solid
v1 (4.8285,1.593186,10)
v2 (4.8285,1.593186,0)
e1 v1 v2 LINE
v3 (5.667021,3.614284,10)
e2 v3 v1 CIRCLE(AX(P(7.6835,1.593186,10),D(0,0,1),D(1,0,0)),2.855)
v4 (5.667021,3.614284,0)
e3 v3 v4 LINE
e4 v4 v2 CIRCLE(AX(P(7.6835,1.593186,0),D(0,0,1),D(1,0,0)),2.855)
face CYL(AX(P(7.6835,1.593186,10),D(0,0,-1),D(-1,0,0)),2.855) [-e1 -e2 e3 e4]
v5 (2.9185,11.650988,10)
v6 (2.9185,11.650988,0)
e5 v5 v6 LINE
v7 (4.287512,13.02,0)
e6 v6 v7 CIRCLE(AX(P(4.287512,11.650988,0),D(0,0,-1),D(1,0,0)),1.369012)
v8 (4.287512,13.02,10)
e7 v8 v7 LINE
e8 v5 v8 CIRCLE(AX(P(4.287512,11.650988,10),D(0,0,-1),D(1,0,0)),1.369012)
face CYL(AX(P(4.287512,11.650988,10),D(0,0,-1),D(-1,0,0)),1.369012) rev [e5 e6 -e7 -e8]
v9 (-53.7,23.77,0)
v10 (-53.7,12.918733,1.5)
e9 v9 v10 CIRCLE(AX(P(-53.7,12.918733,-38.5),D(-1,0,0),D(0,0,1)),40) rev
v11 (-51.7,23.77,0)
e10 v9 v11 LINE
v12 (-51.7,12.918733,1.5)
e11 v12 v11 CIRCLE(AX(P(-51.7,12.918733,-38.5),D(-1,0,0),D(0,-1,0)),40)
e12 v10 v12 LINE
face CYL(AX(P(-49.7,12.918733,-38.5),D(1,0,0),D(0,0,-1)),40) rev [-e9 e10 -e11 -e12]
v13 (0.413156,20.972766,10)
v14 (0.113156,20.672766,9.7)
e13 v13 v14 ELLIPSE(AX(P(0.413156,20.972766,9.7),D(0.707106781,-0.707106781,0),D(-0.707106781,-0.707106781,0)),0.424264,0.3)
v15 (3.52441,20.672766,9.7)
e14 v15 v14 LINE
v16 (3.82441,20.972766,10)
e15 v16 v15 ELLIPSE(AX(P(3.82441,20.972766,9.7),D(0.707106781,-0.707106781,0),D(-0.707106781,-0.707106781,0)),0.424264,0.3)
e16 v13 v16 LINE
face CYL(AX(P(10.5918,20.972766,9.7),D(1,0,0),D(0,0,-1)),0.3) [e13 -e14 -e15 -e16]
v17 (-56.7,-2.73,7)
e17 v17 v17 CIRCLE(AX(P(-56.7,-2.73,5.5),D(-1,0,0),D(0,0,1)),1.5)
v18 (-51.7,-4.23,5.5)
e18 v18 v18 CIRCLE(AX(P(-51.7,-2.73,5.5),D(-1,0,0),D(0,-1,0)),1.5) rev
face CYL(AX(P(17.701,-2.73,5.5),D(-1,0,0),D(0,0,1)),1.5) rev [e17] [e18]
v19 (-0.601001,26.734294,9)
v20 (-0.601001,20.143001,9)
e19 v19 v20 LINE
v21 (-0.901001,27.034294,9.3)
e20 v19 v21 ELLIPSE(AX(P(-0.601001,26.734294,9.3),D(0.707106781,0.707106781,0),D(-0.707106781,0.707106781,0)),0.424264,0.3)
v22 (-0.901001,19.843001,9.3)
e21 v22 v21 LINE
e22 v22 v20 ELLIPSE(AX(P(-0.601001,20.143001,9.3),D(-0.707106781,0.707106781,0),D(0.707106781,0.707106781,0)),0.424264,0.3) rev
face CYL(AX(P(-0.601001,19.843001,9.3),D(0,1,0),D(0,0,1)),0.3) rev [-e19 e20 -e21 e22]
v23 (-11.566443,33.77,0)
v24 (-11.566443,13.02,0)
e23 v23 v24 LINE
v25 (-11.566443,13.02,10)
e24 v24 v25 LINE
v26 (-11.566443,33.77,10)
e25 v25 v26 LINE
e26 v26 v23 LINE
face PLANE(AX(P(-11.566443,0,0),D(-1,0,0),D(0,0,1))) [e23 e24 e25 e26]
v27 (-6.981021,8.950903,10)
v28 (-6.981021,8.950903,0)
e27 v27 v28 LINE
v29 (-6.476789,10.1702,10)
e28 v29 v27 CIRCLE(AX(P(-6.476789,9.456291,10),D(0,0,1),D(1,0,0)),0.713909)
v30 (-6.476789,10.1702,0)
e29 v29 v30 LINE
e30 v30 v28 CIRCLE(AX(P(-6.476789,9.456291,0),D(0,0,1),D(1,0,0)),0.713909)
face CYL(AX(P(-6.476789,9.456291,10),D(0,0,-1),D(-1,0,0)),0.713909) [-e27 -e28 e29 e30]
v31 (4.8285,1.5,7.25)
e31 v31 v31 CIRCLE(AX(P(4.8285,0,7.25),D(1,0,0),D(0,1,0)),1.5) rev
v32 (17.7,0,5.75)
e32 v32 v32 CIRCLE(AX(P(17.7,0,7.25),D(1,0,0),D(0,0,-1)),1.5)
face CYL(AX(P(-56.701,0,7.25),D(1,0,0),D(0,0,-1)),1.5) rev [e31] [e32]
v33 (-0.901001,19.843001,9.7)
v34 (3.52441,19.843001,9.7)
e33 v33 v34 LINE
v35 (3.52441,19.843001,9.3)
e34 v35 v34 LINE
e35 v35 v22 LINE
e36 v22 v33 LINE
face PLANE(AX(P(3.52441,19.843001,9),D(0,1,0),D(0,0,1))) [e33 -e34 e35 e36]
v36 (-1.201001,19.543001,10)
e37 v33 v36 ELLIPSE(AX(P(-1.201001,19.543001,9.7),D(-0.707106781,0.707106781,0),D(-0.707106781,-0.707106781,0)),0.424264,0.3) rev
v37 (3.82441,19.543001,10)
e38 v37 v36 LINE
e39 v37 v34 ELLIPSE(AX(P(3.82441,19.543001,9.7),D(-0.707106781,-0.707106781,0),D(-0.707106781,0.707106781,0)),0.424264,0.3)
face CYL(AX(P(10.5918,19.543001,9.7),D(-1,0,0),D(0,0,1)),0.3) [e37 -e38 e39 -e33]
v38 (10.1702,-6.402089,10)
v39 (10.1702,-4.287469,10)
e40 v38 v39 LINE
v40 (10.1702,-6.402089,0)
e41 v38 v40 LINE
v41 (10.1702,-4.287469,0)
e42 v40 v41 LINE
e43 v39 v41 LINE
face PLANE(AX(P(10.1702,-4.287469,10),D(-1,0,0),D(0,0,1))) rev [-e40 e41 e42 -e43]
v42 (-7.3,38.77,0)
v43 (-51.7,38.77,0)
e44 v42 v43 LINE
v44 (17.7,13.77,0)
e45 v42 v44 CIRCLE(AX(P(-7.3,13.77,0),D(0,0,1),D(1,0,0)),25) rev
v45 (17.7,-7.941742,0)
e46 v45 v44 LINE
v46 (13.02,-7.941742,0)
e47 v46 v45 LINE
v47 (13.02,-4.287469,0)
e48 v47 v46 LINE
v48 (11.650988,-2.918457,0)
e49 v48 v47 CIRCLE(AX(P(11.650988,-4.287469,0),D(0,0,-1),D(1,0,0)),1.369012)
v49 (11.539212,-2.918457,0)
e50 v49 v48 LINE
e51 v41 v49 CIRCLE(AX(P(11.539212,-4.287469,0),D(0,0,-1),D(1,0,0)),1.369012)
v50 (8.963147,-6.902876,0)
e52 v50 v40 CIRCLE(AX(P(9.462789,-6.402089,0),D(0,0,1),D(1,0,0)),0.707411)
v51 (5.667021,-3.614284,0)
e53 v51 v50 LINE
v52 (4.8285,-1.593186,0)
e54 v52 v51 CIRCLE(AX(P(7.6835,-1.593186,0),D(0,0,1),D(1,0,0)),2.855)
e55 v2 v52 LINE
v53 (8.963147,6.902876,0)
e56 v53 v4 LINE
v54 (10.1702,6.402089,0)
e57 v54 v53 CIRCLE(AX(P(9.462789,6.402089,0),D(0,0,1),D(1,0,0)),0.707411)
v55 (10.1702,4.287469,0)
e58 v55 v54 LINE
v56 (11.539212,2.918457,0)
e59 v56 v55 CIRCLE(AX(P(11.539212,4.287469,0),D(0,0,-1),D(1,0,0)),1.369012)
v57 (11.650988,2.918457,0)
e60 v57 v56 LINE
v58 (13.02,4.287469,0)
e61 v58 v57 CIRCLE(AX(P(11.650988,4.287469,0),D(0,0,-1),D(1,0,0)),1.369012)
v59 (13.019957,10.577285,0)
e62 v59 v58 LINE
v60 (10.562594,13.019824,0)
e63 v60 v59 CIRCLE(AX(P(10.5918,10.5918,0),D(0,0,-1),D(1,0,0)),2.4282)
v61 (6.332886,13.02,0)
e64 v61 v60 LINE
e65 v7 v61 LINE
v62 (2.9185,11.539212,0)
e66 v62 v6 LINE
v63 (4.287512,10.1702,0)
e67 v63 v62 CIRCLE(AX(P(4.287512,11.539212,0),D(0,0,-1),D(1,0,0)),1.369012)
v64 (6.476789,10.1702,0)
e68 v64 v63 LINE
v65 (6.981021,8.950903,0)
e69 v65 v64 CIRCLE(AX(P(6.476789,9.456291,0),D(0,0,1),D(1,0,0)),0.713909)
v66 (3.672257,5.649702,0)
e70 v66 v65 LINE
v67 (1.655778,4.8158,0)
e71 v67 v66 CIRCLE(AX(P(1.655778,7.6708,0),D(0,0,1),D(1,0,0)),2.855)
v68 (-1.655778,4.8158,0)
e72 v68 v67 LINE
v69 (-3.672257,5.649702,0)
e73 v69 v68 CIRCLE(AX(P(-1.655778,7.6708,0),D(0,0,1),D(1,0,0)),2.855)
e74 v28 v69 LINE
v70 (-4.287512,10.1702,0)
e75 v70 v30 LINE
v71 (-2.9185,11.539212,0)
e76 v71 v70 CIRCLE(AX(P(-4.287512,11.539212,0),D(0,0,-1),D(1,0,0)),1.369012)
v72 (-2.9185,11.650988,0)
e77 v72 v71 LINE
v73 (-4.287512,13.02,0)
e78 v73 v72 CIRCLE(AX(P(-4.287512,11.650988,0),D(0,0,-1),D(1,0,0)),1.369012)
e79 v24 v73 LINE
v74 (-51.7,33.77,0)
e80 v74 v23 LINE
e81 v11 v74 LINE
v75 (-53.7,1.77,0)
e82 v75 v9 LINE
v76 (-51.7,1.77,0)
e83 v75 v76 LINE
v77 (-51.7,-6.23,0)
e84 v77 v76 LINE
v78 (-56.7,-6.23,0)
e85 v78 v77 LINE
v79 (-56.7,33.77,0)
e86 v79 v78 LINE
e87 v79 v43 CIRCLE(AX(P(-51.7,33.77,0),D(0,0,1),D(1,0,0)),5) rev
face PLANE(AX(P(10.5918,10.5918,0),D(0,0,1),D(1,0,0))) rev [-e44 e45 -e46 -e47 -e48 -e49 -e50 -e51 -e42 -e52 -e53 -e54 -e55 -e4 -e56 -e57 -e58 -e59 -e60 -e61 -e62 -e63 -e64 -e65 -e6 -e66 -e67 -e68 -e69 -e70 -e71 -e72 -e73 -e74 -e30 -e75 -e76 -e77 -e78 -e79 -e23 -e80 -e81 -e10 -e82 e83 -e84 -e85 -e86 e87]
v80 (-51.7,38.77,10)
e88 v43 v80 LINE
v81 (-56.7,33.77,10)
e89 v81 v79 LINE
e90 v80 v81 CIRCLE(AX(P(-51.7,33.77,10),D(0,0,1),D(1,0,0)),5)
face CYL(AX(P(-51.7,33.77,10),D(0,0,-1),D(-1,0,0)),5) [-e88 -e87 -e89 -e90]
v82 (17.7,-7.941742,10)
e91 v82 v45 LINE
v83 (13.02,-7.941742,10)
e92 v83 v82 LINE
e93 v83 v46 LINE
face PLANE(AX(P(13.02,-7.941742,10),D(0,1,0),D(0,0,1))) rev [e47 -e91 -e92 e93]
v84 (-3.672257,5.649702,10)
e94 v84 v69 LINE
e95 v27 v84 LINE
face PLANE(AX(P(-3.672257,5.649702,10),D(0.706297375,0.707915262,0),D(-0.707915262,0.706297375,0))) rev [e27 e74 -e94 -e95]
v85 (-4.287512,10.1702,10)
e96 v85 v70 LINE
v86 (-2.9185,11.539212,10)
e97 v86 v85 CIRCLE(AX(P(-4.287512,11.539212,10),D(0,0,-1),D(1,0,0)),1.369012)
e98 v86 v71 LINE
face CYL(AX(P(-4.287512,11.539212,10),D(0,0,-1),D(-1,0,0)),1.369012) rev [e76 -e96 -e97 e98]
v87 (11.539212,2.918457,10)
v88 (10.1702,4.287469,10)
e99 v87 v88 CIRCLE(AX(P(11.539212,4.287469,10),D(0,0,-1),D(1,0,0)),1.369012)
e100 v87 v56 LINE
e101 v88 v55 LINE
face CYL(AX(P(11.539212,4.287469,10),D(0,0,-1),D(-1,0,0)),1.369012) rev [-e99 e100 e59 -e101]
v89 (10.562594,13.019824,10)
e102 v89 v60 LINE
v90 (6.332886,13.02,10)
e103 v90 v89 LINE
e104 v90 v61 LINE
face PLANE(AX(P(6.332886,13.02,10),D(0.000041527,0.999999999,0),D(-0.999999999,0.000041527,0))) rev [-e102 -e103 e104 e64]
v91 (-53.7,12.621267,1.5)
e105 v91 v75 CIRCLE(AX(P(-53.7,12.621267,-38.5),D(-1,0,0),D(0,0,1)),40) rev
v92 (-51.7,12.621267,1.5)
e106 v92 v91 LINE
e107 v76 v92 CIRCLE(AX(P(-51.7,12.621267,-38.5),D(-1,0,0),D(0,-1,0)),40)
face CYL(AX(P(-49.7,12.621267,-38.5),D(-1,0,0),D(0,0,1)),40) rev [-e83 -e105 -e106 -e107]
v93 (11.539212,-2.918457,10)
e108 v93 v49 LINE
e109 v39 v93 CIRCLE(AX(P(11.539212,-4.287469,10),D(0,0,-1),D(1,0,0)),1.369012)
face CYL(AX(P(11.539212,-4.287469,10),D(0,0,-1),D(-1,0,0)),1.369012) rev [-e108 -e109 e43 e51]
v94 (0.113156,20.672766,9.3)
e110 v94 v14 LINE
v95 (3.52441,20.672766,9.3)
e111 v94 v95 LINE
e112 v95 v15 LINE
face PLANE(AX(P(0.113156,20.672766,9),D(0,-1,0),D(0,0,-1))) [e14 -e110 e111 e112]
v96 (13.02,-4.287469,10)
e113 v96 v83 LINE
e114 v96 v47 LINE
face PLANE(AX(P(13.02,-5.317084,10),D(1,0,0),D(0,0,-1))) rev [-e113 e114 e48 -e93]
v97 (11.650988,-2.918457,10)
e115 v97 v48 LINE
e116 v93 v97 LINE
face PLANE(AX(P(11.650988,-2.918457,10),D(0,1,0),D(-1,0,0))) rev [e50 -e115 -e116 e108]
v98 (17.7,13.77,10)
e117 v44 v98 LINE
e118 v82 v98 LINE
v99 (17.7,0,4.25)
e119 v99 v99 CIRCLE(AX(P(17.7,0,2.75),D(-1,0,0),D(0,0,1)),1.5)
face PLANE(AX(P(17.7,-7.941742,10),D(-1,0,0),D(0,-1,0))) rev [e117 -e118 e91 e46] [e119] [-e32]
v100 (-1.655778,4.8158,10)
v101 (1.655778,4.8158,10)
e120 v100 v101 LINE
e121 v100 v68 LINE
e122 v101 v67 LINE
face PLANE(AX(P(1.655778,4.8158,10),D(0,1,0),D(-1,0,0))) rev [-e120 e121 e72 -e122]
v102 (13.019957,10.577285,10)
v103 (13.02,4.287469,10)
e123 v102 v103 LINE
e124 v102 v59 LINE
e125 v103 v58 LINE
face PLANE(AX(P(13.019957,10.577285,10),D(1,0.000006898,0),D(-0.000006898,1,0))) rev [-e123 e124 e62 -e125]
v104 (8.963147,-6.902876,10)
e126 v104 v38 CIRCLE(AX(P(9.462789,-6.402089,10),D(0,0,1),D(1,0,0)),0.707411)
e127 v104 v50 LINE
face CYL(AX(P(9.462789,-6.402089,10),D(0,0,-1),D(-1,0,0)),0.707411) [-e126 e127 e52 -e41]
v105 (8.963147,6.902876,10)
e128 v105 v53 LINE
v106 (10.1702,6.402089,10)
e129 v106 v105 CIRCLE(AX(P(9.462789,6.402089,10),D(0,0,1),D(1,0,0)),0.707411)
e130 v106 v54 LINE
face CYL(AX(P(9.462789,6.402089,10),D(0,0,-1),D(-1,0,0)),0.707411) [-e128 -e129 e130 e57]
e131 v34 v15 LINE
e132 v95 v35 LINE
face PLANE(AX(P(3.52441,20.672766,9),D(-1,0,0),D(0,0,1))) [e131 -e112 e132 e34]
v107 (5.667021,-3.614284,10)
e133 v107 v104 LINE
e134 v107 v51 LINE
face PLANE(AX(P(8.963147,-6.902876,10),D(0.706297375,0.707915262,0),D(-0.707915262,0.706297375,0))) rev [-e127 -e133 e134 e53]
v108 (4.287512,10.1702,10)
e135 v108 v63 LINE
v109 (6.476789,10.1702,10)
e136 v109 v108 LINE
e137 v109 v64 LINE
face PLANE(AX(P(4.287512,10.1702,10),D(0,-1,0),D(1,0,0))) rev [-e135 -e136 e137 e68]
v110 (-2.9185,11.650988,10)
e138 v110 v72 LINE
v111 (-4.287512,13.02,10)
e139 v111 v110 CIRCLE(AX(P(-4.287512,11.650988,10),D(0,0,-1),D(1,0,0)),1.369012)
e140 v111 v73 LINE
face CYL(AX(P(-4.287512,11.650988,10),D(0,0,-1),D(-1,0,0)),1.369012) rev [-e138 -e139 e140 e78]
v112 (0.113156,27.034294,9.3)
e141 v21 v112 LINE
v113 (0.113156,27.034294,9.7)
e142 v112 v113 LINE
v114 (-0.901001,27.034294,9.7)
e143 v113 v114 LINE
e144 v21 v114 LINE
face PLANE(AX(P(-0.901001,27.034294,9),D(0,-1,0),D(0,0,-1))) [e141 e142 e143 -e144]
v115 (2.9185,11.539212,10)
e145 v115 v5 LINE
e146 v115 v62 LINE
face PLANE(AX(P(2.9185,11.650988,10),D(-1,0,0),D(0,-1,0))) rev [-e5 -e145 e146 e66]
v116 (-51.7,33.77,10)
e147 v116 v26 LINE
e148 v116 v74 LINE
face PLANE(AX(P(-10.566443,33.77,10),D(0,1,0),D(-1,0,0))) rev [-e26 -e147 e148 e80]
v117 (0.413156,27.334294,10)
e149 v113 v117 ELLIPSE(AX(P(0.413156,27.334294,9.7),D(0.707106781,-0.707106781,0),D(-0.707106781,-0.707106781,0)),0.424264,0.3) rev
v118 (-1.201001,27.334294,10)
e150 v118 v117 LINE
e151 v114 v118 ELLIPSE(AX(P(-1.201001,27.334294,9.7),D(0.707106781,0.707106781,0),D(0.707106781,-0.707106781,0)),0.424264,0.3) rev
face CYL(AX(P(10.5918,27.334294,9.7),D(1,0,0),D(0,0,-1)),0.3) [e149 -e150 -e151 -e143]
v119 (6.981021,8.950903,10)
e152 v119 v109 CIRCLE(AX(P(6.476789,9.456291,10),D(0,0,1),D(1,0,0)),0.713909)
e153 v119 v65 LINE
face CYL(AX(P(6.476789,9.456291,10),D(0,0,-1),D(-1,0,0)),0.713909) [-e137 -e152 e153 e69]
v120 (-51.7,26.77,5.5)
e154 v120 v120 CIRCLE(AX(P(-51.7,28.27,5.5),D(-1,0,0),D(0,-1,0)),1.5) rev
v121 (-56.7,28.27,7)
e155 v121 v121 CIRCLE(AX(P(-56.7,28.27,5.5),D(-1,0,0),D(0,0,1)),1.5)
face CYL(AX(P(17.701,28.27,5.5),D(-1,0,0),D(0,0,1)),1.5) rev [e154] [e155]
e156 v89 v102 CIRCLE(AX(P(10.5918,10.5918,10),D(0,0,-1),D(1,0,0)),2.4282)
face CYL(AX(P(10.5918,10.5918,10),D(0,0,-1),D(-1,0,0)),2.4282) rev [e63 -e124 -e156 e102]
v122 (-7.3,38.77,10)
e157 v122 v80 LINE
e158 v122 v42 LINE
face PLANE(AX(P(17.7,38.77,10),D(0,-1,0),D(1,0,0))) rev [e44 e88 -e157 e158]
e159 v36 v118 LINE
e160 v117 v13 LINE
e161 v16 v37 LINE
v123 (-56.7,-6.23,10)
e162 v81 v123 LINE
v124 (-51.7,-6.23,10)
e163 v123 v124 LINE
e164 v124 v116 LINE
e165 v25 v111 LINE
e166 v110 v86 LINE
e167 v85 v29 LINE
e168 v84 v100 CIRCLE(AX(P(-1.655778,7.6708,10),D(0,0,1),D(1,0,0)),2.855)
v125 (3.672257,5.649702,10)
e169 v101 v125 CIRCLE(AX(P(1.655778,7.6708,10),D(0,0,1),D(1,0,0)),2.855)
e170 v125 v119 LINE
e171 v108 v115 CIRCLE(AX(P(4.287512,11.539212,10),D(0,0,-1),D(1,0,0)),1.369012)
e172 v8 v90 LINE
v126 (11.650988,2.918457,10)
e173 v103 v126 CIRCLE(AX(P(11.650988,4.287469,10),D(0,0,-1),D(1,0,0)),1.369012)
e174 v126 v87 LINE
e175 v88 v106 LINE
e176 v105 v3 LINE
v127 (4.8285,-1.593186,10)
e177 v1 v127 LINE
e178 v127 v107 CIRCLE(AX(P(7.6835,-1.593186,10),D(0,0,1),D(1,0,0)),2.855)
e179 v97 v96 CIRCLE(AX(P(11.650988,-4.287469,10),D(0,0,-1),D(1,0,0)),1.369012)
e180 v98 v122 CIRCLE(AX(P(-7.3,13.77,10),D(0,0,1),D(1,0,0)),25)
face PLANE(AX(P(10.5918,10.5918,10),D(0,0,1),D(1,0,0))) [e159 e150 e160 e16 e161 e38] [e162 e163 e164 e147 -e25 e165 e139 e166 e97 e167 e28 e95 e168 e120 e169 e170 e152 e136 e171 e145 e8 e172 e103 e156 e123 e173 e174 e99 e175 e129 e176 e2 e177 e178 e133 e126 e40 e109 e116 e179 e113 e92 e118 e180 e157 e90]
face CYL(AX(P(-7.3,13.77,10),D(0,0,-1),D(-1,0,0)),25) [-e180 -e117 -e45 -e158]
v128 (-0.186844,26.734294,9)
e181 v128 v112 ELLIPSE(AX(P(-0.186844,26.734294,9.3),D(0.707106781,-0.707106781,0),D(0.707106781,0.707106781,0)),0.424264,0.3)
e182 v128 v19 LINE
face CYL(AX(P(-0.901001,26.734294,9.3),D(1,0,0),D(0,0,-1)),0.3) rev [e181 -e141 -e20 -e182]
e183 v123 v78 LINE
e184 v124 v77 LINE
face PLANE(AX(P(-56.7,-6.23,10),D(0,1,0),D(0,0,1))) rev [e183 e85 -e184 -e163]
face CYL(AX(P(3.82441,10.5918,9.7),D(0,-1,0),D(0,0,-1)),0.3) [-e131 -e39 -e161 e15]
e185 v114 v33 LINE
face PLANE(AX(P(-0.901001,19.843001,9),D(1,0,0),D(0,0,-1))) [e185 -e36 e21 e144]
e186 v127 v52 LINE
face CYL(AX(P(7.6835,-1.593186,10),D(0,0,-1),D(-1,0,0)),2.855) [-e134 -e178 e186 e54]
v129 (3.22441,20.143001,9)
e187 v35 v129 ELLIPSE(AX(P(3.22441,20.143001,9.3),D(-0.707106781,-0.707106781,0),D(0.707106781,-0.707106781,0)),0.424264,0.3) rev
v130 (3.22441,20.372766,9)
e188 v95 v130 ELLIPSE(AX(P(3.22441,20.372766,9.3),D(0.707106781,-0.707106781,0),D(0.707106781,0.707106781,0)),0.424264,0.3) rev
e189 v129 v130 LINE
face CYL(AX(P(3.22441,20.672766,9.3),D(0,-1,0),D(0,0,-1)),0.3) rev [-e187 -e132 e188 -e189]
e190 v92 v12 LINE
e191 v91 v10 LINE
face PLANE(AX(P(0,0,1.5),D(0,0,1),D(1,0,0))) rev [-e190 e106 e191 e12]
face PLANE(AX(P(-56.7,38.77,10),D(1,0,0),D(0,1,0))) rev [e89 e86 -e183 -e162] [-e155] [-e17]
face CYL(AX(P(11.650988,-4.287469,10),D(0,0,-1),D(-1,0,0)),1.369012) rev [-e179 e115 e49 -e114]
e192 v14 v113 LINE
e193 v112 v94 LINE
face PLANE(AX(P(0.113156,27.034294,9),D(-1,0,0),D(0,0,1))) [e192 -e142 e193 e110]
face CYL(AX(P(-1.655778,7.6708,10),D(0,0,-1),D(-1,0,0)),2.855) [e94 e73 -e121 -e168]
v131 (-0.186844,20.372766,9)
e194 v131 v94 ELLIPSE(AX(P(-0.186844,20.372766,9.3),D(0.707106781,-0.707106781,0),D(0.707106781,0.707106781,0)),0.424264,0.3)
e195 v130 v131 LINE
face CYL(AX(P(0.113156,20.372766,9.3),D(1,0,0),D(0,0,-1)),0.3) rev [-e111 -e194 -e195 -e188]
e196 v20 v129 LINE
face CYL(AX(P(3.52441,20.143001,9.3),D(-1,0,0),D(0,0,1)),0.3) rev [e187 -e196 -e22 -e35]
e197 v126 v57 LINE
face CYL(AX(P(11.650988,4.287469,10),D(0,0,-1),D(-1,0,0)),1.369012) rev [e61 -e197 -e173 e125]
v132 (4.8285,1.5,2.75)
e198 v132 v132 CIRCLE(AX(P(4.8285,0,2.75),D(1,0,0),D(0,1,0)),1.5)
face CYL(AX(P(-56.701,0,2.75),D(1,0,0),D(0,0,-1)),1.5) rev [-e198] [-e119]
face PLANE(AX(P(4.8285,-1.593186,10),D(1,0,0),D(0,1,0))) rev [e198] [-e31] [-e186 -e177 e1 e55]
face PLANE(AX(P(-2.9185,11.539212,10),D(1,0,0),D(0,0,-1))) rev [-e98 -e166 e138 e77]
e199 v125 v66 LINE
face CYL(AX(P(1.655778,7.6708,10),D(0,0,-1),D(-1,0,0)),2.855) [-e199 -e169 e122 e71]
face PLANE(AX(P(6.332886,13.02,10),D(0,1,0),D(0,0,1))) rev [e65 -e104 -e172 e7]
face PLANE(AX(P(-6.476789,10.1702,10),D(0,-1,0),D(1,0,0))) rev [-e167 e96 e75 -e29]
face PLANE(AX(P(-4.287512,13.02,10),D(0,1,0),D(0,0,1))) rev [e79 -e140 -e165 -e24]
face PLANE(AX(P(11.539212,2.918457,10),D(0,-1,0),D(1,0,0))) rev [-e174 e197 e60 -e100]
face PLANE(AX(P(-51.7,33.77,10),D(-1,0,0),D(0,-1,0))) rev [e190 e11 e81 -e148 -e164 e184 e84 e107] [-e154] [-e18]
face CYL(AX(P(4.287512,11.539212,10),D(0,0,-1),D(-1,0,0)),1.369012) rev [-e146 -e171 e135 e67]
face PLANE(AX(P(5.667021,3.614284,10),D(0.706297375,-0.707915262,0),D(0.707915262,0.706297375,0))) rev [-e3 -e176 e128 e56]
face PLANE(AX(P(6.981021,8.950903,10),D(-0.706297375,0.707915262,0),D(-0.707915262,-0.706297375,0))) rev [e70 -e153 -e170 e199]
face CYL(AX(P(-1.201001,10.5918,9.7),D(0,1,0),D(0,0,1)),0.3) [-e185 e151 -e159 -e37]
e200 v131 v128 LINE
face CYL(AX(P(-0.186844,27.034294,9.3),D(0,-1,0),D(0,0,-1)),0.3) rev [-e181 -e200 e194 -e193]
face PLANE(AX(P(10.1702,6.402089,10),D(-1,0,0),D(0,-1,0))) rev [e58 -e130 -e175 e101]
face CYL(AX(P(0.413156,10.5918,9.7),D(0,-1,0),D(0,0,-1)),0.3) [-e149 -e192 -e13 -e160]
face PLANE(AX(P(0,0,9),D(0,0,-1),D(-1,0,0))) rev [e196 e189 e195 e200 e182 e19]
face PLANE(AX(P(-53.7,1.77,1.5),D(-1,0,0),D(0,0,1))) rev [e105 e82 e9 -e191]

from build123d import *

# Parameters (mm, degrees)
BOSS_EXTRUDE1_DEPTH = 10
CUT_EXTRUDE1_REACH  = 86.489
SKETCH2_R           = 1.5
FILLET3_R           = 5
CUT_EXTRUDE2_REACH  = 86.489
SKETCH3_R           = 1.5
FILLET4_R           = 25
CUT_EXTRUDE7_DEPTH  = 1
FILLET8_R           = 0.3
SKETCH8_W           = 10
SKETCH8_H           = 20.75
BOSS_EXTRUDE2_DEPTH = 1
SKETCH10_W          = 4
SKETCH10_H          = 22
CUT_EXTRUDE9_DEPTH  = 1.5
FILLET10_R          = 40


with BuildPart() as part:
    # Sketch1 → Boss-Extrude1 (new body)
    with BuildSketch(Plane.XY):
        with BuildLine():
            Line((13.02, -7.9417418), (17.7, -7.9417418))
            Line((17.7, -7.9417418), (17.7, 38.77))
            Line((17.7, 38.77), (-56.7, 38.77))
            Line((-56.7, 38.77), (-56.7, -6.23))
            Line((-56.7, -6.23), (-51.7, -6.23))
            Line((-51.7, -6.23), (-51.7, 33.77))
            Line((-51.7, 33.77), (-10.566443095, 33.77))
            Line((-10.566443095, 33.77), (-10.566443095, 13.02))
            Line((-10.566443095, 13.02), (-5.317126718, 13.02))
            Line((-5.317126718, 13.02), (-4.287512407, 13.02))
            ThreePointArc((-4.287512407, 13.02), (-3.319474451, 12.619025549), (-2.9185, 11.650987593))
            Line((-2.9185, 11.650987593), (-2.9185, 11.539212407))
            ThreePointArc((-2.9185, 11.539212407), (-3.319474451, 10.571174451), (-4.287512407, 10.1702))
            Line((-4.287512407, 10.1702), (-6.476788598, 10.1702))
            ThreePointArc((-6.476788598, 10.1702), (-7.136510935, 9.729114651), (-6.981020848, 8.950903446))
            Line((-6.981020848, 8.950903446), (-3.672257405, 5.649701928))
            ThreePointArc((-3.672257405, 5.649701928), (-2.746830644, 5.032499411), (-1.655778399, 4.8158))
            Line((-1.655778399, 4.8158), (1.655778399, 4.8158))
            ThreePointArc((1.655778399, 4.8158), (2.746830644, 5.032499411), (3.672257405, 5.649701928))
            Line((3.672257405, 5.649701928), (6.981020848, 8.950903446))
            ThreePointArc((6.981020848, 8.950903446), (7.136510935, 9.729114651), (6.476788598, 10.1702))
            Line((6.476788598, 10.1702), (4.287512407, 10.1702))
            ThreePointArc((4.287512407, 10.1702), (3.319474451, 10.571174451), (2.9185, 11.539212407))
            Line((2.9185, 11.539212407), (2.9185, 11.650987593))
            ThreePointArc((2.9185, 11.650987593), (3.319474451, 12.619025549), (4.287512407, 13.02))
            Line((4.287512407, 13.02), (6.332886163, 13.02))
            Line((6.332886163, 13.02), (10.562594215, 13.019824354))
            ThreePointArc((10.562594215, 13.019824354), (12.303594776, 12.313982883), (13.019956614, 10.577284622))
            Line((13.019956614, 10.577284622), (13.02, 4.287469289))
            ThreePointArc((13.02, 4.287469289), (12.619025549, 3.319431332), (11.650987593, 2.918456882))
            Line((11.650987593, 2.918456882), (11.539212407, 2.918456882))
            ThreePointArc((11.539212407, 2.918456882), (10.571174451, 3.319431332), (10.1702, 4.287469289))
            Line((10.1702, 4.287469289), (10.1702, 6.402089023))
            ThreePointArc((10.1702, 6.402089023), (9.733877283, 7.055496588), (8.963146507, 6.90287605))
            Line((8.963146507, 6.90287605), (5.667020993, 3.614283579))
            ThreePointArc((5.667020993, 3.614283579), (5.046449321, 2.687255303), (4.8285, 1.593185507))
            Line((4.8285, 1.593185507), (4.8285, -1.593185507))
            ThreePointArc((4.8285, -1.593185507), (5.046449321, -2.687255303), (5.667020993, -3.614283579))
            Line((5.667020993, -3.614283579), (8.963146507, -6.90287605))
            ThreePointArc((8.963146507, -6.90287605), (9.733877283, -7.055496588), (10.1702, -6.402089023))
            Line((10.1702, -6.402089023), (10.1702, -4.287469289))
            ThreePointArc((10.1702, -4.287469289), (10.571174451, -3.319431332), (11.539212407, -2.918456882))
            Line((11.539212407, -2.918456882), (11.650987593, -2.918456882))
            ThreePointArc((11.650987593, -2.918456882), (12.619025549, -3.319431332), (13.02, -4.287469289))
            Line((13.02, -4.287469289), (13.02, -5.3170836))
            Line((13.02, -5.3170836), (13.02, -7.9417418))
        make_face()
    extrude(amount=BOSS_EXTRUDE1_DEPTH)

    # Sketch2 → Cut-Extrude1 (cut, up to next)
    with BuildSketch(Plane.ZY.offset(56.7), mode=Mode.PRIVATE) as cut_extrude1_sk1:
        with Locations((5.5, -2.73)):
            Circle(SKETCH2_R)
    cut_extrude1_tool1 = extrude(cut_extrude1_sk1.sketch, amount=-CUT_EXTRUDE1_REACH, mode=Mode.PRIVATE) & part.part
    # Sketch2 → Cut-Extrude1 (cut, up to next)
    with BuildSketch(Plane.ZY.offset(56.7), mode=Mode.PRIVATE) as cut_extrude1_sk2:
        with Locations((5.5, 28.27)):
            Circle(SKETCH2_R)
    cut_extrude1_tool2 = extrude(cut_extrude1_sk2.sketch, amount=-CUT_EXTRUDE1_REACH, mode=Mode.PRIVATE) & part.part
    add(cut_extrude1_tool1.solids().sort_by_distance((-56.7, -2.73, 5.5))[0], mode=Mode.SUBTRACT)
    add(cut_extrude1_tool2.solids().sort_by_distance((-56.7, 28.27, 5.5))[0], mode=Mode.SUBTRACT)

    # Fillet3
    fillet3_edges = [part.edges().sort_by_distance(p)[0] for p in [
        (-56.7, 38.77, 5),
    ]]
    fillet(fillet3_edges, radius=FILLET3_R)

    # Sketch3 → Cut-Extrude2 (cut, up to next)
    with BuildSketch(Plane(origin=(17.7, 0, 0), x_dir=(0, 0, -1), z_dir=(1, 0, 0)), mode=Mode.PRIVATE) as cut_extrude2_sk1:
        with Locations((-7.25, 0)):
            Circle(SKETCH3_R)
    cut_extrude2_tool1 = extrude(cut_extrude2_sk1.sketch, amount=-CUT_EXTRUDE2_REACH, mode=Mode.PRIVATE) & part.part
    # Sketch3 → Cut-Extrude2 (cut, up to next)
    with BuildSketch(Plane(origin=(17.7, 0, 0), x_dir=(0, 0, -1), z_dir=(1, 0, 0)), mode=Mode.PRIVATE) as cut_extrude2_sk2:
        with Locations(Location((-2.75, 0, 0), (0, 0, 90))):
            Circle(SKETCH3_R)
    cut_extrude2_tool2 = extrude(cut_extrude2_sk2.sketch, amount=-CUT_EXTRUDE2_REACH, mode=Mode.PRIVATE) & part.part
    add(cut_extrude2_tool1.solids().sort_by_distance((17.7, 0, 7.25))[0], mode=Mode.SUBTRACT)
    add(cut_extrude2_tool2.solids().sort_by_distance((17.7, 0, 2.75))[0], mode=Mode.SUBTRACT)

    # Fillet4
    fillet4_edges = [part.edges().sort_by_distance(p)[0] for p in [
        (17.7, 38.77, 5),
    ]]
    fillet(fillet4_edges, radius=FILLET4_R)

    # Sketch7 → Cut-Extrude7 (cut)
    with BuildSketch(Plane.XY.offset(10)):
        Polygon((-0.90100078, 19.84300121), (-0.90100078, 27.034293528), (0.113155829, 27.034293528), (0.113155829, 20.672765708), (3.524409877, 20.672765708), (3.524409877, 19.84300121), align=None)
    extrude(amount=-CUT_EXTRUDE7_DEPTH, mode=Mode.SUBTRACT)

    # Fillet8
    fillet8_edges = [part.edges().sort_by_distance(p)[0] for p in [
        (1.311704549, 19.84300121, 10),
        (-0.90100078, 23.438647369, 10),
        (-0.393922475, 27.034293528, 10),
        (0.113155829, 23.853529618, 10),
        (1.818782853, 20.672765708, 10),
        (3.524409877, 20.257883459, 10),
        (1.311704549, 19.84300121, 9),
        (-0.90100078, 23.438647369, 9),
        (-0.393922475, 27.034293528, 9),
        (0.113155829, 23.853529618, 9),
        (1.818782853, 20.672765708, 9),
        (3.524409877, 20.257883459, 9),
    ]]
    fillet(fillet8_edges, radius=FILLET8_R)

    # Sketch8 → Boss-Extrude2 (add)
    with BuildSketch(Plane.ZY.offset(10.566443095)):
        with Locations((5, 23.395)):
            Rectangle(SKETCH8_W, SKETCH8_H)
    extrude(amount=BOSS_EXTRUDE2_DEPTH)

    # Sketch10 → Cut-Extrude9 (cut)
    with BuildSketch(Plane(origin=(0, 0, 0), x_dir=(-1, 0, 0), z_dir=(0, 0, -1))):
        with Locations((51.7, 12.77)):
            Rectangle(SKETCH10_W, SKETCH10_H)
    extrude(amount=-CUT_EXTRUDE9_DEPTH, mode=Mode.SUBTRACT)

    # Fillet10
    # the kernel refuses this fillet: 40 mm, written as the material it adds along each edge
    with BuildSketch(Plane(origin=(-51.7, 1.77, 1.5), x_dir=(0, 0, -1), z_dir=(-1, 0, 0))) as fillet10_piece_1:
        with BuildLine():
            CenterArc((40, -10.851267207), FILLET10_R, 164.259451475, 15.740548525)
            Line((0, -10.851267207), (0, 0))
            Line((0, 0), (1.5, 0))
        make_face()
    extrude(amount=2)
    with BuildSketch(Plane(origin=(-53.7, 23.77, 1.5), x_dir=(0, -1, 0), z_dir=(1, 0, 0))) as fillet10_piece_2:
        with BuildLine():
            CenterArc((10.851267207, 40), FILLET10_R, 254.259451475, 15.740548525)
            Line((0, 1.5), (0, 0))
            Line((0, 0), (10.851267207, 0))
        make_face()
    extrude(amount=2)


solid = part.part
